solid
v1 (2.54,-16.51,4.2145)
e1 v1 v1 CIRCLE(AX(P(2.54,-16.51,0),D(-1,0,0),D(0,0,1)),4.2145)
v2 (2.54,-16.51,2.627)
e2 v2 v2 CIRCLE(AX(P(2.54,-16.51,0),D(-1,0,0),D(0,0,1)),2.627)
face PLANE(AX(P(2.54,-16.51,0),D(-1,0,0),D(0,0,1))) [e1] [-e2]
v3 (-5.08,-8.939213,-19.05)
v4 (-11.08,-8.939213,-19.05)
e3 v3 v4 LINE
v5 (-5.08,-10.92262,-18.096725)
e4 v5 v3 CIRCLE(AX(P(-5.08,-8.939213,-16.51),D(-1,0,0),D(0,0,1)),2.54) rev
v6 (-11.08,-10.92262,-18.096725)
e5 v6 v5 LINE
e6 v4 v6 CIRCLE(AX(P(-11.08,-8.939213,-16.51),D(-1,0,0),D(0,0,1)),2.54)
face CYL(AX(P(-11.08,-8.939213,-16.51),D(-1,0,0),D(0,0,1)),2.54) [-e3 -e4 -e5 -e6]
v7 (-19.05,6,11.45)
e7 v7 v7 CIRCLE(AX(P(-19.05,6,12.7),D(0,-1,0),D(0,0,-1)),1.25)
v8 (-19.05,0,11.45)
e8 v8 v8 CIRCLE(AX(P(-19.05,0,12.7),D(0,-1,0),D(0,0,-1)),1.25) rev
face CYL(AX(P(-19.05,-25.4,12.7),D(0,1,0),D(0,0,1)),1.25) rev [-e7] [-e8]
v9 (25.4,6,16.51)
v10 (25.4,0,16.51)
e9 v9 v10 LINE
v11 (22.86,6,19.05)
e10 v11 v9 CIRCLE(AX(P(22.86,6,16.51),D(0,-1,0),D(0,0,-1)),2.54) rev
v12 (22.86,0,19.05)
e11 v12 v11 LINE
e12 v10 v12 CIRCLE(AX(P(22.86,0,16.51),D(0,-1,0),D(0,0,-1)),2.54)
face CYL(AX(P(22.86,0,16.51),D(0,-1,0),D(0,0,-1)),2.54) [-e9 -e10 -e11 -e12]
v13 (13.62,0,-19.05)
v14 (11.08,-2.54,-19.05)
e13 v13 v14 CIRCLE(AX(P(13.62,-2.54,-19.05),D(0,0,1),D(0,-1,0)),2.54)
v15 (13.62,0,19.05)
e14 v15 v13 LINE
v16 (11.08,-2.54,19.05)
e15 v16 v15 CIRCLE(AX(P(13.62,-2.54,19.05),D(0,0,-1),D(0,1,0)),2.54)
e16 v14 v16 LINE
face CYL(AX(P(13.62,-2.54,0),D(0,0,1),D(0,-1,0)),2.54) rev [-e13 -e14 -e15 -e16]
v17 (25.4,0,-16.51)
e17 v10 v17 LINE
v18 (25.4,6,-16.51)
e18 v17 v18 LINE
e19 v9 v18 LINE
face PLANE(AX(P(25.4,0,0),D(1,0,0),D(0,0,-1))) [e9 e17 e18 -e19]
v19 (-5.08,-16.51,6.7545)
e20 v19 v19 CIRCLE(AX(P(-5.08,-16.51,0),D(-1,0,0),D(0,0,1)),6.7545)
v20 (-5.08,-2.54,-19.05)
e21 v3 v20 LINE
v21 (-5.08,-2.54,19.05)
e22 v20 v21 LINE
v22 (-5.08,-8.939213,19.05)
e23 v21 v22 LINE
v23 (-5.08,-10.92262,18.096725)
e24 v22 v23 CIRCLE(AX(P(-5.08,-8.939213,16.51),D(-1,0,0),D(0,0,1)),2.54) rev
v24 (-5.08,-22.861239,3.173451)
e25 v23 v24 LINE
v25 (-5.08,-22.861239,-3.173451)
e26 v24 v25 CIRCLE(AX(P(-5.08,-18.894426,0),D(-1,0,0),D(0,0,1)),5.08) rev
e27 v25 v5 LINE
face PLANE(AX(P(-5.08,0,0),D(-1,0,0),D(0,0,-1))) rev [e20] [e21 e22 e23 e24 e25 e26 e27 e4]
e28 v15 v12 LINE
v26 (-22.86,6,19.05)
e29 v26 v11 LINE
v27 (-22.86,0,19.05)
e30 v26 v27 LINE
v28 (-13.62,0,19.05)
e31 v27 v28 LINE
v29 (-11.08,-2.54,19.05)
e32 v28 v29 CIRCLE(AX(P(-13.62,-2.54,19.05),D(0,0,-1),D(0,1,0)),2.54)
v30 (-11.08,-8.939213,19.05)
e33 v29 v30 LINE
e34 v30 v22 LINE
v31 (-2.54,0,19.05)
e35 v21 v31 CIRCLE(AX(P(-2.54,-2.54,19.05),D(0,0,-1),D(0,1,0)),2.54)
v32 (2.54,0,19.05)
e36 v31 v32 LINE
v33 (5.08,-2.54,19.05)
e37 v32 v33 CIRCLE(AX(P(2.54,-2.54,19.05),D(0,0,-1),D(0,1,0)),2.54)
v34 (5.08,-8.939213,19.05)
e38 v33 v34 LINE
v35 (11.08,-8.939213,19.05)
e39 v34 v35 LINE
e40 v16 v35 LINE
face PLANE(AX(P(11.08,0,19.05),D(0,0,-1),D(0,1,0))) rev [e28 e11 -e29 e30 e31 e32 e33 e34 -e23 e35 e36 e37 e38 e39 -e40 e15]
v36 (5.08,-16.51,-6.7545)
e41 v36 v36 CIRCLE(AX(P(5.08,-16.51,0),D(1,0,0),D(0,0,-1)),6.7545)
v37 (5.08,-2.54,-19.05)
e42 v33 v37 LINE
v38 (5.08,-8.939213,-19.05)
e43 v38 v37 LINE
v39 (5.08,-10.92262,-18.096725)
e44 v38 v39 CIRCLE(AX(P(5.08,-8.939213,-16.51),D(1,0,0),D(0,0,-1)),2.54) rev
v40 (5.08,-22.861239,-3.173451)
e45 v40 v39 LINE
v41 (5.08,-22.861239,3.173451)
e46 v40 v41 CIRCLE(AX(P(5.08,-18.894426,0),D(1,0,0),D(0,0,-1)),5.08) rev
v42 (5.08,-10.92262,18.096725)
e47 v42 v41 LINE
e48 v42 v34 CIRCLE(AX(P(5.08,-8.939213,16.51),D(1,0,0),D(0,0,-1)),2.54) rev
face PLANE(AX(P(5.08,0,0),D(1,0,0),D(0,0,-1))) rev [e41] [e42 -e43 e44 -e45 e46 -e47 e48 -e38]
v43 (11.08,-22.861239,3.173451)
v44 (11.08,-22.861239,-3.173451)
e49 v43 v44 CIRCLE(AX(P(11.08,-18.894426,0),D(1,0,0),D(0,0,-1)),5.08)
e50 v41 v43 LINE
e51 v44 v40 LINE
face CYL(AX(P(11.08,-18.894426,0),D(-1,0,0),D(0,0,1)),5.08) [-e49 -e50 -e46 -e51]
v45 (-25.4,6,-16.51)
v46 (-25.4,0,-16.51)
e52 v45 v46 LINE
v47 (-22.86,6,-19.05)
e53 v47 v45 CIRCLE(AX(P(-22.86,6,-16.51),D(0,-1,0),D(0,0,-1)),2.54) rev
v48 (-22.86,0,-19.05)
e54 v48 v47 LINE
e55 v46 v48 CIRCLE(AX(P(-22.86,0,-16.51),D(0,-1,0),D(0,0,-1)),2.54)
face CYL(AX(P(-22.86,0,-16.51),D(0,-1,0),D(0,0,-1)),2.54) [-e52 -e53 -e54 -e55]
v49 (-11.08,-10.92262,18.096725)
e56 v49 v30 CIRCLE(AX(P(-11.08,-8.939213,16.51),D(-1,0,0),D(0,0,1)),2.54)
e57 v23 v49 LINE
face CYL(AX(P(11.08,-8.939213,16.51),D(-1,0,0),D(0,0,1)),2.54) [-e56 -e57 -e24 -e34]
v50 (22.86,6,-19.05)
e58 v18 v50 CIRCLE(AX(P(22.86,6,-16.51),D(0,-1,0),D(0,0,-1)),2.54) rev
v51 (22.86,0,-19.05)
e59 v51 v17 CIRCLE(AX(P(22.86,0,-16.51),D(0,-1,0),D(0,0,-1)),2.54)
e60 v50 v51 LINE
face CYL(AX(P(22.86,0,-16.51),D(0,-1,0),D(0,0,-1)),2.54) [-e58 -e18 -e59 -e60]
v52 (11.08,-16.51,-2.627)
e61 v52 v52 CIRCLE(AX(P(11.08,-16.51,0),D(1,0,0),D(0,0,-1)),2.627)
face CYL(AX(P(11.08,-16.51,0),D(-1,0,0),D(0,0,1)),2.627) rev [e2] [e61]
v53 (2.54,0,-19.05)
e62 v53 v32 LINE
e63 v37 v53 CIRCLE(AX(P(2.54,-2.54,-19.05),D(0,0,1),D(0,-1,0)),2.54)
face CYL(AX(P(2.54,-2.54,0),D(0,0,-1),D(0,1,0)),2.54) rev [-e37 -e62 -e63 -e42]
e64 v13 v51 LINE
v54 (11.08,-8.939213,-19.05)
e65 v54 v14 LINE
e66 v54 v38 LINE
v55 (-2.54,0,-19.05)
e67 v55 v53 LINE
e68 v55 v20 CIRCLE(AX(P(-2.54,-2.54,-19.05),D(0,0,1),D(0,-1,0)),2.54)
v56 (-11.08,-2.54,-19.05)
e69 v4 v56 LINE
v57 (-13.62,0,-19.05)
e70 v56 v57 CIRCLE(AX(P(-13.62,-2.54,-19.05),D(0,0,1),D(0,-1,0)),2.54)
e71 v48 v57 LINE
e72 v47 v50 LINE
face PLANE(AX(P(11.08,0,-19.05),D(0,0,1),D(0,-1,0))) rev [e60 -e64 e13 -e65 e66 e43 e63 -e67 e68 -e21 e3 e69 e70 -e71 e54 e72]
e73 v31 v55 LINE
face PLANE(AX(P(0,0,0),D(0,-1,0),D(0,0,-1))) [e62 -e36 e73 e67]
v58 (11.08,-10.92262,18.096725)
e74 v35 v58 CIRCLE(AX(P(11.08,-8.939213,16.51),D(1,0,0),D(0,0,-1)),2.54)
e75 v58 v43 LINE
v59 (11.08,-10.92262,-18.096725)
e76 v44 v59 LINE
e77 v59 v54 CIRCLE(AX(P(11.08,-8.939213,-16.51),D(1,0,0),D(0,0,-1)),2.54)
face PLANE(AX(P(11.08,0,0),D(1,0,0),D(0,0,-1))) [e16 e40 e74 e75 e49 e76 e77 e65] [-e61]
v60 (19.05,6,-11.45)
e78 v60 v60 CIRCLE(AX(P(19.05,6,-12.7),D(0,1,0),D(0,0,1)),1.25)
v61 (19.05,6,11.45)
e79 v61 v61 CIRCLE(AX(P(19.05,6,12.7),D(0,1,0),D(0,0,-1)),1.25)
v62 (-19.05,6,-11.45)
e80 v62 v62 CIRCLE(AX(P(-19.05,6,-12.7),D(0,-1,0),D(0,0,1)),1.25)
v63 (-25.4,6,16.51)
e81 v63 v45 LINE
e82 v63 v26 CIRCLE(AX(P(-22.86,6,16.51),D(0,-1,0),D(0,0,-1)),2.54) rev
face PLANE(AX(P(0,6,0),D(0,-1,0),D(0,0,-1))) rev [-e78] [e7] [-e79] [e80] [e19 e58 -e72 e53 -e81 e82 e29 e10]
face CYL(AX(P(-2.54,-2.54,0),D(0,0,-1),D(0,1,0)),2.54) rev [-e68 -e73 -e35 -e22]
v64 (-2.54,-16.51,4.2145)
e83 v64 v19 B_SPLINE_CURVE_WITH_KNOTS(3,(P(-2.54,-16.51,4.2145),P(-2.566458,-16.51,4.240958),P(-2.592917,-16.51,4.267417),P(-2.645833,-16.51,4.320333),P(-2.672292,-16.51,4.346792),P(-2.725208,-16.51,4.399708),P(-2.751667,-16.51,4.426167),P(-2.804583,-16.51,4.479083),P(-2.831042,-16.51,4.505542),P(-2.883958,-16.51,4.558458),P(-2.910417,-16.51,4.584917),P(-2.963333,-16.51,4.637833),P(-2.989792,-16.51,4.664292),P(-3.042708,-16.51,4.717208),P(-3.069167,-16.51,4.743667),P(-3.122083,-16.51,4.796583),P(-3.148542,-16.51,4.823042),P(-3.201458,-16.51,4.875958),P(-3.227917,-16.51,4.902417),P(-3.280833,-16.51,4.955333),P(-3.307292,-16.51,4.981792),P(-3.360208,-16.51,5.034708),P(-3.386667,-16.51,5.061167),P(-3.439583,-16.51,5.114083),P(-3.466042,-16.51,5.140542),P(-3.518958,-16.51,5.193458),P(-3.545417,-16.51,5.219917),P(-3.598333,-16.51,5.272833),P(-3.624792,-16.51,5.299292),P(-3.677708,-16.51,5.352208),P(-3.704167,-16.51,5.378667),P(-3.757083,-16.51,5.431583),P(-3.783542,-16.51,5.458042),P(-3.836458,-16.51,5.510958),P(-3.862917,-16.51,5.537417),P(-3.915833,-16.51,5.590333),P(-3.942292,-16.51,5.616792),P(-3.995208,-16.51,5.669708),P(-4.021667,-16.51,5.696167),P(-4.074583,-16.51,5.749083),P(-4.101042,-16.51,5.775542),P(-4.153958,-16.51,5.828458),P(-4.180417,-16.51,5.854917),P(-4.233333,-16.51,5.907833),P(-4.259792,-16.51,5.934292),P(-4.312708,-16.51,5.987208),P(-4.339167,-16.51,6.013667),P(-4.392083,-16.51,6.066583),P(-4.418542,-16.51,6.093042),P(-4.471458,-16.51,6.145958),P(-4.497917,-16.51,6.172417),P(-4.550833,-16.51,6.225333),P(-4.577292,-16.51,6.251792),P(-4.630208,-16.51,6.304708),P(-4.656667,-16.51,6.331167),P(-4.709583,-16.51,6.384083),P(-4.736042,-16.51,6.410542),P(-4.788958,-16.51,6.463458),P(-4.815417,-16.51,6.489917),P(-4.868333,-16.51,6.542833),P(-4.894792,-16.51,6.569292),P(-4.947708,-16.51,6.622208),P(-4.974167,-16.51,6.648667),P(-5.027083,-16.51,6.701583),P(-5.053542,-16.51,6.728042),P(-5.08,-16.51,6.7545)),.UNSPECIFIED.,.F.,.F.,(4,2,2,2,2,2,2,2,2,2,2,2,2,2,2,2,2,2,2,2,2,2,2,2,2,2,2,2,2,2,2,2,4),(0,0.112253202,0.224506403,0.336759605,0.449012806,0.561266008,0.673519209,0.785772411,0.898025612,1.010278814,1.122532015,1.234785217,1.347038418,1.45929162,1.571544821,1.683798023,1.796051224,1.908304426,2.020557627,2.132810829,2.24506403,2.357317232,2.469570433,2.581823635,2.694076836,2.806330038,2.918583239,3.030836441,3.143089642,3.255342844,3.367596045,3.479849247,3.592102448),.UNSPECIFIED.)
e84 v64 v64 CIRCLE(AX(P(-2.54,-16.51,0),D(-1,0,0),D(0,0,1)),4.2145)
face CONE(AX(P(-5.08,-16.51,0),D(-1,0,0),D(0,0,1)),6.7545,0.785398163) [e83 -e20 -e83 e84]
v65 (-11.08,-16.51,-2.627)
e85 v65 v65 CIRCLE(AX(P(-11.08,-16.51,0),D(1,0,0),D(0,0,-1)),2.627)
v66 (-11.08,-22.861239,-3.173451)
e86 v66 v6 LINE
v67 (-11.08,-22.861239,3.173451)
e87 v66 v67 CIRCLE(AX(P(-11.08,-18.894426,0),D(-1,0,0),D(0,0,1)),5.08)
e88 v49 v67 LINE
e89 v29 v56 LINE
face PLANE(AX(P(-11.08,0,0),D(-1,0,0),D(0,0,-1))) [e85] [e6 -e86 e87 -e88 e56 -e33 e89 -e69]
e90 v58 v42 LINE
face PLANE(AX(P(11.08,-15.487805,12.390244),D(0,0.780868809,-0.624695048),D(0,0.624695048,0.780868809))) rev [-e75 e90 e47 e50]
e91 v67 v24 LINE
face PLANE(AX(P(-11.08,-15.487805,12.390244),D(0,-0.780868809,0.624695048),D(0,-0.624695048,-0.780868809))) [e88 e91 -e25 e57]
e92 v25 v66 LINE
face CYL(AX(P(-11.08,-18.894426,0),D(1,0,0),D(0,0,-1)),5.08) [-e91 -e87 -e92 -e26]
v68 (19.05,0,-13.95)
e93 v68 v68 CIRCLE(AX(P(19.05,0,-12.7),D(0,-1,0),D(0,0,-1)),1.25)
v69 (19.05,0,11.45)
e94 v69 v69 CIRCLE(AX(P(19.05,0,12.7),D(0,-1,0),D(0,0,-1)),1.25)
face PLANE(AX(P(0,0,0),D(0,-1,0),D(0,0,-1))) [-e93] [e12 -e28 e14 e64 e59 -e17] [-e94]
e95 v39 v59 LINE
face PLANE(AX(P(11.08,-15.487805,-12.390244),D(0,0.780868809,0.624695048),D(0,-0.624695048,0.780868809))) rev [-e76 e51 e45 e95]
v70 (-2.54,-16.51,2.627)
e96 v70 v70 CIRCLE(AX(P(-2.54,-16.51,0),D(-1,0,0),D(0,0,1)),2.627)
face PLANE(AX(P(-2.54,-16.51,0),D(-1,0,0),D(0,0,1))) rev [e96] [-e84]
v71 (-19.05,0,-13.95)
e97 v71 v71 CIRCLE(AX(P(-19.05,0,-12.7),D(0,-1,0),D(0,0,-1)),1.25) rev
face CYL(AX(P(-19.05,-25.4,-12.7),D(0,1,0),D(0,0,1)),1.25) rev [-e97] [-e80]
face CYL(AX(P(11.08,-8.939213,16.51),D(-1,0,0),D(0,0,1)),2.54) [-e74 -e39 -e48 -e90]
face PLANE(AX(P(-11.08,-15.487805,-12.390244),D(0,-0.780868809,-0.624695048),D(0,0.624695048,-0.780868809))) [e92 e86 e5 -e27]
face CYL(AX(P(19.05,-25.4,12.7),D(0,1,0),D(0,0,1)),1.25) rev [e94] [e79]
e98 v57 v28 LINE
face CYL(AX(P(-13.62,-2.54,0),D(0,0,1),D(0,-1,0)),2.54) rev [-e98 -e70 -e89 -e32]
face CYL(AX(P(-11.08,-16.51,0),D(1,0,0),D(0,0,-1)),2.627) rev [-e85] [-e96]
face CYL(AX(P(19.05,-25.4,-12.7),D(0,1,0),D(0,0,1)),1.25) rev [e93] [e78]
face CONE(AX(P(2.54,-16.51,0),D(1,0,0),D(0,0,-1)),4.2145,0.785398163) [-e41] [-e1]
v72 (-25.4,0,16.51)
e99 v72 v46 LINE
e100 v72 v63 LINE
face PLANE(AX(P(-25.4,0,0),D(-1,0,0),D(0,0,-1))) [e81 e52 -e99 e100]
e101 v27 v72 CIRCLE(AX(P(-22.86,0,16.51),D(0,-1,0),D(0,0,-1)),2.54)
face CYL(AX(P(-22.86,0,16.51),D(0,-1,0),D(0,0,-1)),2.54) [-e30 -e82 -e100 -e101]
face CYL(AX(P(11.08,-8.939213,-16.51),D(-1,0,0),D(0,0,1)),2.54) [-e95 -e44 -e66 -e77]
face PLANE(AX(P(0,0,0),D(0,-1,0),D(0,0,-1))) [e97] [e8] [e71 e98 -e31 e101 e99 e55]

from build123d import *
from OCP.BRepFilletAPI import BRepFilletAPI_MakeFillet

# Parameters (mm, degrees)
SKETCH1_R           = 2.627
BOSS_EXTRUDE1_DEPTH = 6
BOSS_EXTRUDE2_START = -5.08
SKETCH1_3_W         = 38.1
SKETCH1_3_H         = 5.999999938
BOSS_EXTRUDE2_DEPTH = 25.4
SKETCH3_R           = 1.25
CUT_EXTRUDE1_DEPTH  = 45.654479015
FILLET1_R1          = 2.54
FILLET1_R2          = 5.08
SKETCH4_R           = 4.2145
SKETCH4_R_2         = 2.627
BOSS_EXTRUDE3_DEPTH = 2.54
BOSS_EXTRUDE4_START = 7.62
SKETCH4_2_R         = 4.2145
SKETCH4_2_R_2       = 2.627
BOSS_EXTRUDE4_DEPTH = 2.54
CHAMFER2_SIZE       = 2.54


with BuildPart() as part:
    # Sketch1 → Boss-Extrude1 (new body)
    with BuildSketch(Plane(origin=(5.08, 0, 0), x_dir=(0, 0, -1), z_dir=(1, 0, 0))):
        Polygon((-19.05, 0), (-19.05, -10.16), (0, -25.4), (19.05, -10.16), (19.05, 0), align=None)
        with Locations((0, -16.51)):
            Circle(SKETCH1_R, mode=Mode.SUBTRACT)
    boss_extrude1 = extrude(amount=BOSS_EXTRUDE1_DEPTH)

    # Sketch1<3> → Boss-Extrude2 (add)
    with BuildSketch(Plane(origin=(5.08, 0, 0), x_dir=(0, 0, -1), z_dir=(1, 0, 0)).offset(BOSS_EXTRUDE2_START)):
        with Locations((0, 2.999999969)):
            Rectangle(SKETCH1_3_W, SKETCH1_3_H)
    boss_extrude2 = extrude(amount=BOSS_EXTRUDE2_DEPTH)

    # Sketch3 → Cut-Extrude1 (cut, through all)
    with BuildSketch(Plane(origin=(0, 5.999999938, 0), x_dir=(1, 0, 0), z_dir=(0, 1, 0))):
        with Locations(Location((19.05, 12.7, 0), (0, 0, 270))):
            Circle(SKETCH3_R)
        with Locations(Location((19.05, -12.7, 0), (0, 0, 90))):
            Circle(SKETCH3_R)
    cut_extrude1 = extrude(amount=-CUT_EXTRUDE1_DEPTH, mode=Mode.SUBTRACT)

    # Mirror2: Boss-Extrude2, Cut-Extrude1 across plane
    add(boss_extrude2.mirror(Plane(origin=(0, 0, 0), x_dir=(0, 0, 1), z_dir=(1, 0, 0))))
    add(cut_extrude1.mirror(Plane(origin=(0, 0, 0), x_dir=(0, 0, 1), z_dir=(1, 0, 0))), mode=Mode.SUBTRACT)

    # Mirror3: Boss-Extrude1 across plane
    add(boss_extrude1.mirror(Plane(origin=(0, 0, 0), x_dir=(0, 0, 1), z_dir=(1, 0, 0))))

    # Fillet1: one fillet with a radius per group of edges: ONE call of the kernel's fillet builder (fillet() takes one radius for all edges)
    fillet1_edges_1 = [part.edges().sort_by_distance(p)[0] for p in [
        (8.08, -10.16, 19.05),
        (8.08, -10.16, -19.05),
        (11.08, 0, 0),
        (25.4, 2.999999969, 19.05),
        (25.4, 2.999999969, -19.05),
        (-25.4, 2.999999969, -19.05),
        (-25.4, 2.999999969, 19.05),
        (-8.08, -10.16, -19.05),
        (-8.08, -10.16, 19.05),
        (-5.08, 0, 0),
        (-11.08, 0, 0),
        (5.08, 0, 0),
    ]]
    fillet1_edges_2 = [part.edges().sort_by_distance(p)[0] for p in [
        (8.08, -25.4, 0),
        (-8.08, -25.4, 0),
    ]]
    fillet1 = BRepFilletAPI_MakeFillet(part.part.solid().wrapped)
    for e in fillet1_edges_1:
        fillet1.Add(FILLET1_R1, e.wrapped)
    for e in fillet1_edges_2:
        fillet1.Add(FILLET1_R2, e.wrapped)
    add(Compound.cast(fillet1.Shape()), mode=Mode.REPLACE)

    # Sketch4 → Boss-Extrude3 (add)
    with BuildSketch(Plane.ZY.offset(-5.08)):
        with Locations(Location((0, -16.51, 0), (0, 0, 180))):
            Circle(SKETCH4_R)
        with Locations((0, -16.51)):
            Circle(SKETCH4_R_2, mode=Mode.SUBTRACT)
    extrude(amount=BOSS_EXTRUDE3_DEPTH)

    # Sketch4<2> → Boss-Extrude4 (add)
    with BuildSketch(Plane.ZY.offset(-5.08).offset(BOSS_EXTRUDE4_START)):
        with Locations(Location((0, -16.51, 0), (0, 0, 180))):
            Circle(SKETCH4_2_R)
        with Locations((0, -16.51)):
            Circle(SKETCH4_2_R_2, mode=Mode.SUBTRACT)
    extrude(amount=BOSS_EXTRUDE4_DEPTH)

    # Chamfer2
    chamfer2_edges = [part.edges().sort_by_distance(p)[0] for p in [
        (5.08, -16.51, 4.2145),
        (-5.08, -16.51, 4.2145),
    ]]
    chamfer(chamfer2_edges, length=CHAMFER2_SIZE - 0.0001)  # a hair under: the kernel refuses the full size


solid = part.part
